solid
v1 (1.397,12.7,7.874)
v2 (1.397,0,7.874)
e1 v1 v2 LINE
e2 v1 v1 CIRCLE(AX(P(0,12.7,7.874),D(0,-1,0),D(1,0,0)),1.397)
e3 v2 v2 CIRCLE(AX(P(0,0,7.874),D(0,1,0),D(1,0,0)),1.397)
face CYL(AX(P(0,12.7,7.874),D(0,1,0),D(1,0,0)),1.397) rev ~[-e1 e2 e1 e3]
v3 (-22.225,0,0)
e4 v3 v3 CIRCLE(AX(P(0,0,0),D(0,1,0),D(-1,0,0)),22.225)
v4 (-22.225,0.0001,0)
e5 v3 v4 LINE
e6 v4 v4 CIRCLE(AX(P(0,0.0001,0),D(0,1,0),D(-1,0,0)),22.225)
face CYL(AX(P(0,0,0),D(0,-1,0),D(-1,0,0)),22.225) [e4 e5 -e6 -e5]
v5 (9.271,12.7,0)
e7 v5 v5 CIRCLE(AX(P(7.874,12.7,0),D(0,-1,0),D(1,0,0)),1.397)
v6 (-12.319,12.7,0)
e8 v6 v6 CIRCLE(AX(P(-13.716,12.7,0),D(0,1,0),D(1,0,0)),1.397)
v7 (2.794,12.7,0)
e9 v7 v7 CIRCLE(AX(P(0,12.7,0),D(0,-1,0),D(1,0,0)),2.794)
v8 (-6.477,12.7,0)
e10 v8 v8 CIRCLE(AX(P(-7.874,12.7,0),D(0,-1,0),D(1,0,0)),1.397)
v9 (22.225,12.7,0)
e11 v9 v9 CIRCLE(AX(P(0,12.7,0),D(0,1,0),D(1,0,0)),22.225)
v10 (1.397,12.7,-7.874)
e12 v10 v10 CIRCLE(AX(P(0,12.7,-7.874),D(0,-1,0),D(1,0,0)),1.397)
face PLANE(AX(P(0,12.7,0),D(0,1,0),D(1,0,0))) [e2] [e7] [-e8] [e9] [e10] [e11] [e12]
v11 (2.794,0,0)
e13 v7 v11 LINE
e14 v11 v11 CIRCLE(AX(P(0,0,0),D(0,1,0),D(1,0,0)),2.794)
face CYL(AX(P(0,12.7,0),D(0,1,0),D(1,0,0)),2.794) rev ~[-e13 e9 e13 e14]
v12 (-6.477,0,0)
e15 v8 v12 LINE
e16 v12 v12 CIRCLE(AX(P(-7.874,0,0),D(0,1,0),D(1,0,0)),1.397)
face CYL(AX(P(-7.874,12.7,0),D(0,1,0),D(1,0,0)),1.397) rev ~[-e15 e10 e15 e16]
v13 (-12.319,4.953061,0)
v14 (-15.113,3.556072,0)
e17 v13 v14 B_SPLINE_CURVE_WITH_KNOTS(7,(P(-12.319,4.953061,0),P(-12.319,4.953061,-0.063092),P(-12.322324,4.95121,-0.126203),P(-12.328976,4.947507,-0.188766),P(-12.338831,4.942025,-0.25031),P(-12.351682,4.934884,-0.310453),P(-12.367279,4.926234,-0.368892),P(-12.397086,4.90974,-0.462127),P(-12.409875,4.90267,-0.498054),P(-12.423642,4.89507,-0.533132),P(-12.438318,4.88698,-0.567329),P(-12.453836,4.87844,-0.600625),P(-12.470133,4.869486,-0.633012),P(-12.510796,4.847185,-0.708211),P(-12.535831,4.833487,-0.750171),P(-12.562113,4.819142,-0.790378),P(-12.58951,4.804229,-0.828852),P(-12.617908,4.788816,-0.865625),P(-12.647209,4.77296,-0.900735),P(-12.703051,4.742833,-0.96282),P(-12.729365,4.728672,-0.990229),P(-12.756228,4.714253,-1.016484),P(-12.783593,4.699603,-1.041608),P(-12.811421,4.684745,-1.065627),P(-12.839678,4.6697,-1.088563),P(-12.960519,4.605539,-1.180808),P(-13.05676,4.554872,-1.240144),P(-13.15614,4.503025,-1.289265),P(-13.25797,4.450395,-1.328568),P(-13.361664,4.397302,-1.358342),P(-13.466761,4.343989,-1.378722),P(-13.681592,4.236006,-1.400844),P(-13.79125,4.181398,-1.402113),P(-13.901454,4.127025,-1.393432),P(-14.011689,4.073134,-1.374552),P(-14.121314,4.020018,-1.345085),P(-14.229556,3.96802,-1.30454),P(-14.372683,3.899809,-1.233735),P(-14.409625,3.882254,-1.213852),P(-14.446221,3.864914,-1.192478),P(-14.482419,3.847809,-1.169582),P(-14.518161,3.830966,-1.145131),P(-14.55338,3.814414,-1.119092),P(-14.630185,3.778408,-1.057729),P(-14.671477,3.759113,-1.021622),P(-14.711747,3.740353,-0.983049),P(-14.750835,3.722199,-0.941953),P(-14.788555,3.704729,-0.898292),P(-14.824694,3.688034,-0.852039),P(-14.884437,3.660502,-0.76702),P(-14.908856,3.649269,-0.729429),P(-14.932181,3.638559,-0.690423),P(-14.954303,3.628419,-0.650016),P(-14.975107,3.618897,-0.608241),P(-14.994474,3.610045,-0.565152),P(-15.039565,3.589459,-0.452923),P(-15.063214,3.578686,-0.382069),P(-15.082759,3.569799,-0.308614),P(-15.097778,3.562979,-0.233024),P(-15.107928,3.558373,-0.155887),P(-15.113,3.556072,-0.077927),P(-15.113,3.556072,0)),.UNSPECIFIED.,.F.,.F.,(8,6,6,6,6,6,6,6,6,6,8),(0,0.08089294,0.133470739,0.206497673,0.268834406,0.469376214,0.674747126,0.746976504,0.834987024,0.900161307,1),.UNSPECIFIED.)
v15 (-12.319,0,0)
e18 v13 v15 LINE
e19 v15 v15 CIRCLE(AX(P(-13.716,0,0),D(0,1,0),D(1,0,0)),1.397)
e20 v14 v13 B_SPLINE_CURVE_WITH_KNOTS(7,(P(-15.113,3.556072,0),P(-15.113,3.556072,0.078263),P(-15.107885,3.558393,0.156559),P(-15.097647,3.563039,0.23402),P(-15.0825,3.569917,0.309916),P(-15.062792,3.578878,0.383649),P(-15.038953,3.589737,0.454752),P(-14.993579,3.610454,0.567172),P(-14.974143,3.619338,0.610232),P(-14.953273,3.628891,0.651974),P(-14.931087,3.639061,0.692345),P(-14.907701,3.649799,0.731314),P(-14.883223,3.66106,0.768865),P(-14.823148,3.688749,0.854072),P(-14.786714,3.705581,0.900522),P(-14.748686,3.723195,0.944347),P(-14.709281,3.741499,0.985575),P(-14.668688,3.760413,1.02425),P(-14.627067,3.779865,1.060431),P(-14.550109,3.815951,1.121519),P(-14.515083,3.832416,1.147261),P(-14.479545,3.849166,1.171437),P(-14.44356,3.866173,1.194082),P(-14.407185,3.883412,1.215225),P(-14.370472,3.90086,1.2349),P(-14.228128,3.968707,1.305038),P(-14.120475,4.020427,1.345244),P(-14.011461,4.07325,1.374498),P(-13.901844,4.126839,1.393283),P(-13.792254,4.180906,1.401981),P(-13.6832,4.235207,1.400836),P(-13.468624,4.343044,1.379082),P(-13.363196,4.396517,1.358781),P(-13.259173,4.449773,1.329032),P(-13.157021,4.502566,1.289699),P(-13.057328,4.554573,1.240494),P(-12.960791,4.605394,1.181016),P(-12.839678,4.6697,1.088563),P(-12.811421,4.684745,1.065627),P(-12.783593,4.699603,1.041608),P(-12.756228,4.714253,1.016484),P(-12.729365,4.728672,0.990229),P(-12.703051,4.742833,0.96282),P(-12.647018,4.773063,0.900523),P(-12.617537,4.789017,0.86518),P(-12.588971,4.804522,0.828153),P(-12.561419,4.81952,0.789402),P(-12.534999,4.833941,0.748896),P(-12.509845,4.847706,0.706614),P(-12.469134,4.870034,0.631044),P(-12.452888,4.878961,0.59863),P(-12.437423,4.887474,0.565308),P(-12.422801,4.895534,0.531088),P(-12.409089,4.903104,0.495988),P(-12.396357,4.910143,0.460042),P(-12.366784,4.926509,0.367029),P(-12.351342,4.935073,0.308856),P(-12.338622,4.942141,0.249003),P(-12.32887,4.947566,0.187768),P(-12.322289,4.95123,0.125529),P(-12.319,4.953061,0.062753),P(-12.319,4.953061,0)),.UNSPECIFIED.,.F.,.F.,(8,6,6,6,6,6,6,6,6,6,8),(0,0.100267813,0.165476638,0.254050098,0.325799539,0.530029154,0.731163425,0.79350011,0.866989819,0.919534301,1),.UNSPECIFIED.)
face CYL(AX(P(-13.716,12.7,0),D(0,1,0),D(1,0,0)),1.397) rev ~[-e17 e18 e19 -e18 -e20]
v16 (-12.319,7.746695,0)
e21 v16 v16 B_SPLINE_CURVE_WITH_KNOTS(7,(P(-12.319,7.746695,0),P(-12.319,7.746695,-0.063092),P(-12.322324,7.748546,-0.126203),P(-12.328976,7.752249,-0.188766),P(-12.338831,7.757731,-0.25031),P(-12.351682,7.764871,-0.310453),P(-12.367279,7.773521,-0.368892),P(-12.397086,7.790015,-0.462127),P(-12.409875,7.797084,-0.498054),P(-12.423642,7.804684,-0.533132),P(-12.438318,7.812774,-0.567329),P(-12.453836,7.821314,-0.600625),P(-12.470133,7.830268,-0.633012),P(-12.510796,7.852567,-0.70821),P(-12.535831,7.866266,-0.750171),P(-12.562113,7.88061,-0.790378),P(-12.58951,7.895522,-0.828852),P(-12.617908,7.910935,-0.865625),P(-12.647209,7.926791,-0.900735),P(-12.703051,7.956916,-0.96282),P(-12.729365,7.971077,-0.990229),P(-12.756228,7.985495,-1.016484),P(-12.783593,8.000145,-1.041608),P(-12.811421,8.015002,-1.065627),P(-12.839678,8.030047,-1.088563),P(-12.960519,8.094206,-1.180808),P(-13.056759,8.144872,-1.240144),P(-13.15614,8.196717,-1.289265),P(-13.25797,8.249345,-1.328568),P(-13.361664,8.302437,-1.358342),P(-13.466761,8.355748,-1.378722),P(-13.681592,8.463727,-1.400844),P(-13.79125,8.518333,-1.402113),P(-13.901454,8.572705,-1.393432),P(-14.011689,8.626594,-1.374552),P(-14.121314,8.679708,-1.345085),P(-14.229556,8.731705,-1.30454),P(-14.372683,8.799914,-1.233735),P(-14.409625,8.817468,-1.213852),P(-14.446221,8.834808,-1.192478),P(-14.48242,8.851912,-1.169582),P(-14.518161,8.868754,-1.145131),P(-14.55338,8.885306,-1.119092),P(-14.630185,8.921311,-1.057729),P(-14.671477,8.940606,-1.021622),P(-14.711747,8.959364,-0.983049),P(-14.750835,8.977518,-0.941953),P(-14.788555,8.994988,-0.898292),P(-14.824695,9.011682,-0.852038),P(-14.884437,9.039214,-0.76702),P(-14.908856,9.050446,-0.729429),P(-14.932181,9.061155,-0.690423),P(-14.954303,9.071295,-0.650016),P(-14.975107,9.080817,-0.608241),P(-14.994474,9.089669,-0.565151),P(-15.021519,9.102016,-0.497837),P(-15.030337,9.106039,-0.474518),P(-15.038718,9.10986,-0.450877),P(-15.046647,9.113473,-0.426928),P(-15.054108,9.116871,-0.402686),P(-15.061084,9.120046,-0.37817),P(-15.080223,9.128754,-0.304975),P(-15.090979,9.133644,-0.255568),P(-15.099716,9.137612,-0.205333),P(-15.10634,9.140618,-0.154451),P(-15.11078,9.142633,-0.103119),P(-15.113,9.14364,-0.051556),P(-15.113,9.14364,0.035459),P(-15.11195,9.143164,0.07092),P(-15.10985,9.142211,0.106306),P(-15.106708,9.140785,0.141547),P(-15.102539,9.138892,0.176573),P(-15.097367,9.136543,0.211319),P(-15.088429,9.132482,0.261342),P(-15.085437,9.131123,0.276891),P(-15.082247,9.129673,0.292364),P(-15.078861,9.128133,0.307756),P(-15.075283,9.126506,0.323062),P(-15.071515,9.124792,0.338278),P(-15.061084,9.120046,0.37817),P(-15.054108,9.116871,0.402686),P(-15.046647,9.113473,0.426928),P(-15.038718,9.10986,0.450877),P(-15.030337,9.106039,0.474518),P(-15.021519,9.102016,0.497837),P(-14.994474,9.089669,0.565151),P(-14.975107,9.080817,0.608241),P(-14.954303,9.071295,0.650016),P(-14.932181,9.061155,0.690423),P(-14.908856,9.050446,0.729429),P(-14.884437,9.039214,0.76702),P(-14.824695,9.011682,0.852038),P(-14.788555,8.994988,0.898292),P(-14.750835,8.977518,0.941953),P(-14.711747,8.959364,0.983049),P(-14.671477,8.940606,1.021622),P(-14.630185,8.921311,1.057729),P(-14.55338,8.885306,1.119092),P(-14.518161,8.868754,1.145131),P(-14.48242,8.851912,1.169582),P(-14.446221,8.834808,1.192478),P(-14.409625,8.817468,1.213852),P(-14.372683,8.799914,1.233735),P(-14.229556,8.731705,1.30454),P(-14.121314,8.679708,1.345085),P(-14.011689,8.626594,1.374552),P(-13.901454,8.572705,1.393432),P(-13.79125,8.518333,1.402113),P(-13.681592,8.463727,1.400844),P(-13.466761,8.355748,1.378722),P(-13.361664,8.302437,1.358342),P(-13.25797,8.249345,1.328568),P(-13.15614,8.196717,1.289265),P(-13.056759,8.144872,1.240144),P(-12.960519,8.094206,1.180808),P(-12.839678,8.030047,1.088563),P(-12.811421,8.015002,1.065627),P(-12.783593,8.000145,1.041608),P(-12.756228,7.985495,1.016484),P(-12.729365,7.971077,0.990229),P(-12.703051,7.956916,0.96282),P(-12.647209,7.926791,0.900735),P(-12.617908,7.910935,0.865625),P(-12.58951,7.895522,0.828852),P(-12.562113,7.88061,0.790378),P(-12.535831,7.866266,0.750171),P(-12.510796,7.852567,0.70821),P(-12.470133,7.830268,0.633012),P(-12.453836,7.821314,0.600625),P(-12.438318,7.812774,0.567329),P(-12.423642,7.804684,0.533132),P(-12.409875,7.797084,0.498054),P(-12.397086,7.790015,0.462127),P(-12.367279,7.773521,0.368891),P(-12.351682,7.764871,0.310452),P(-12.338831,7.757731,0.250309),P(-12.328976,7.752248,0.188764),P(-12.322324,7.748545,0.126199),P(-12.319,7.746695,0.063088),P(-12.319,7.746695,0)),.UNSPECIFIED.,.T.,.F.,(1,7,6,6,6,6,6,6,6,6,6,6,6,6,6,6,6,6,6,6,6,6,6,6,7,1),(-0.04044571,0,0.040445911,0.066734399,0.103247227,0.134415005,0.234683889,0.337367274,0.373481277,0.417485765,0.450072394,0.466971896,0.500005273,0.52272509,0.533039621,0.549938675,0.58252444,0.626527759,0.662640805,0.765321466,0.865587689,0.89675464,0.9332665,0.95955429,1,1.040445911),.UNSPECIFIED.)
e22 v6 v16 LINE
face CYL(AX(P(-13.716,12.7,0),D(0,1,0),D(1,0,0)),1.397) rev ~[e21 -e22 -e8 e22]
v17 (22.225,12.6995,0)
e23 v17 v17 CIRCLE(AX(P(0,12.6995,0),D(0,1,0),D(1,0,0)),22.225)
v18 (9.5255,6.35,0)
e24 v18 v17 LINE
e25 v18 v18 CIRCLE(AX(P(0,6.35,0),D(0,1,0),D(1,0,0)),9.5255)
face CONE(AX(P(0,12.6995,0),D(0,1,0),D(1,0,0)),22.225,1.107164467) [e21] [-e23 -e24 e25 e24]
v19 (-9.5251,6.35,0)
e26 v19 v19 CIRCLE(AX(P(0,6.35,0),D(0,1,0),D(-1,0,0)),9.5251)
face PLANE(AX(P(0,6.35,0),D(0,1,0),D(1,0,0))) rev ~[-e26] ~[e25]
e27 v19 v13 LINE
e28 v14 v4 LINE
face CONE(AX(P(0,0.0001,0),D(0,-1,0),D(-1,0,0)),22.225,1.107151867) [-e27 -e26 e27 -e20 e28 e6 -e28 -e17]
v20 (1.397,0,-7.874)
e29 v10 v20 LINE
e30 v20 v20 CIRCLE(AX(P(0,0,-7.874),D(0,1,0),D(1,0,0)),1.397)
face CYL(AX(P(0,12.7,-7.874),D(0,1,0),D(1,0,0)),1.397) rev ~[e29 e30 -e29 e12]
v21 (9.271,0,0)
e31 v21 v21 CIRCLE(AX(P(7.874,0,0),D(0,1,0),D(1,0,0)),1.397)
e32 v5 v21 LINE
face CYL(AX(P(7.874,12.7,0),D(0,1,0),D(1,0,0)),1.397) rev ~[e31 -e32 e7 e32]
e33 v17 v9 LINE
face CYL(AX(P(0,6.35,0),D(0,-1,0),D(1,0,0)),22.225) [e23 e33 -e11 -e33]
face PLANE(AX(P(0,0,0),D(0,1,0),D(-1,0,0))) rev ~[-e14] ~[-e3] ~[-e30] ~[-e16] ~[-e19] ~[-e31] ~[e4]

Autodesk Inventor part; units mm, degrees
ref_plane "YZ Plane" through (0, 0, 0) normal (1, 0, 0) x (0, 1, 0)
ref_plane "XZ Plane" through (0, 0, 0) normal (0, 1, 0) x (-1, 0, 0)
ref_plane "XY Plane" through (0, 0, 0) normal (0, 0, 1) x (1, 0, 0)
sketch "Sketch1" plane through (0, 0, 0) normal (0, 1, 0) x (-1, 0, 0)
  circle A0 centre (0, 0) radius 22.225
  dimension "d0" = 44.45
extrude "Extrusion1" add sketch "Sketch1" along normal blind 6.35
chamfer "Chamfer1" distance 12.7 distance2 6.35 1 edges at (22.225, 6.35, 0) measured on face at (-2.0252, 6.35, -4.4852)
sketch "Sketch2" plane through (0, 6.35, 0) normal (0, 1, 0) x (1, 0, 0)
  circle A0 centre (0, 0) radius 22.225
  dimension "d57" = 44.45
extrude "Extrusion2" add sketch "Sketch2" along normal blind 6.35
chamfer "Chamfer2" distance 12.7 distance2 6.35 1 edges at (-22.225, 6.35, 0) measured on face at (17.7764, 6.35, 1.7729)
sketch "Sketch4" plane through (0, 12.7, 0) normal (0, 1, 0) x (1, 0, 0)
  circle A0 centre (0, 0) radius 2.794
  line L0 (0, 0) -> (-7.874, 0)
  line L1 (-7.874, 0) -> (-13.716, 0)
  line L2 (0, 0) -> (0, 7.874)
  line L3 (0, 0) -> (7.874, 0)
  line L4 (0, 0) -> (0, -7.874)
  circle A1 centre (0, -7.874) radius 1.397
  circle A2 centre (7.874, 0) radius 1.397
  circle A3 centre (0, 7.874) radius 1.397
  circle A4 centre (-7.874, 0) radius 1.397
  circle A5 centre (-13.716, 0) radius 1.397
  dimension "d28" = 5.588
  dimension "d29" = 7.874
  dimension "d30" = 5.842
  dimension "d31" = 7.874
  dimension "d32" = 7.874
  dimension "d33" = 7.874
  dimension "d34" = 2.794
  dimension "d35" = 2.794
  dimension "d36" = 2.794
  dimension "d37" = 2.794
  dimension "d38" = 2.794
extrude "Extrusion3" cut sketch "Sketch4" against normal blind 15.24
sketch "Sketch5" plane through (0, 0, 0) normal (0, -1, 0) x (1, 0, 0)
  circle A0 centre (0, 0) radius 2.794 projected
  circle A1 centre (0, 0) radius 11.1125
  dimension "d58" = 22.225
properties part number "String Little Big Wheel V5"
